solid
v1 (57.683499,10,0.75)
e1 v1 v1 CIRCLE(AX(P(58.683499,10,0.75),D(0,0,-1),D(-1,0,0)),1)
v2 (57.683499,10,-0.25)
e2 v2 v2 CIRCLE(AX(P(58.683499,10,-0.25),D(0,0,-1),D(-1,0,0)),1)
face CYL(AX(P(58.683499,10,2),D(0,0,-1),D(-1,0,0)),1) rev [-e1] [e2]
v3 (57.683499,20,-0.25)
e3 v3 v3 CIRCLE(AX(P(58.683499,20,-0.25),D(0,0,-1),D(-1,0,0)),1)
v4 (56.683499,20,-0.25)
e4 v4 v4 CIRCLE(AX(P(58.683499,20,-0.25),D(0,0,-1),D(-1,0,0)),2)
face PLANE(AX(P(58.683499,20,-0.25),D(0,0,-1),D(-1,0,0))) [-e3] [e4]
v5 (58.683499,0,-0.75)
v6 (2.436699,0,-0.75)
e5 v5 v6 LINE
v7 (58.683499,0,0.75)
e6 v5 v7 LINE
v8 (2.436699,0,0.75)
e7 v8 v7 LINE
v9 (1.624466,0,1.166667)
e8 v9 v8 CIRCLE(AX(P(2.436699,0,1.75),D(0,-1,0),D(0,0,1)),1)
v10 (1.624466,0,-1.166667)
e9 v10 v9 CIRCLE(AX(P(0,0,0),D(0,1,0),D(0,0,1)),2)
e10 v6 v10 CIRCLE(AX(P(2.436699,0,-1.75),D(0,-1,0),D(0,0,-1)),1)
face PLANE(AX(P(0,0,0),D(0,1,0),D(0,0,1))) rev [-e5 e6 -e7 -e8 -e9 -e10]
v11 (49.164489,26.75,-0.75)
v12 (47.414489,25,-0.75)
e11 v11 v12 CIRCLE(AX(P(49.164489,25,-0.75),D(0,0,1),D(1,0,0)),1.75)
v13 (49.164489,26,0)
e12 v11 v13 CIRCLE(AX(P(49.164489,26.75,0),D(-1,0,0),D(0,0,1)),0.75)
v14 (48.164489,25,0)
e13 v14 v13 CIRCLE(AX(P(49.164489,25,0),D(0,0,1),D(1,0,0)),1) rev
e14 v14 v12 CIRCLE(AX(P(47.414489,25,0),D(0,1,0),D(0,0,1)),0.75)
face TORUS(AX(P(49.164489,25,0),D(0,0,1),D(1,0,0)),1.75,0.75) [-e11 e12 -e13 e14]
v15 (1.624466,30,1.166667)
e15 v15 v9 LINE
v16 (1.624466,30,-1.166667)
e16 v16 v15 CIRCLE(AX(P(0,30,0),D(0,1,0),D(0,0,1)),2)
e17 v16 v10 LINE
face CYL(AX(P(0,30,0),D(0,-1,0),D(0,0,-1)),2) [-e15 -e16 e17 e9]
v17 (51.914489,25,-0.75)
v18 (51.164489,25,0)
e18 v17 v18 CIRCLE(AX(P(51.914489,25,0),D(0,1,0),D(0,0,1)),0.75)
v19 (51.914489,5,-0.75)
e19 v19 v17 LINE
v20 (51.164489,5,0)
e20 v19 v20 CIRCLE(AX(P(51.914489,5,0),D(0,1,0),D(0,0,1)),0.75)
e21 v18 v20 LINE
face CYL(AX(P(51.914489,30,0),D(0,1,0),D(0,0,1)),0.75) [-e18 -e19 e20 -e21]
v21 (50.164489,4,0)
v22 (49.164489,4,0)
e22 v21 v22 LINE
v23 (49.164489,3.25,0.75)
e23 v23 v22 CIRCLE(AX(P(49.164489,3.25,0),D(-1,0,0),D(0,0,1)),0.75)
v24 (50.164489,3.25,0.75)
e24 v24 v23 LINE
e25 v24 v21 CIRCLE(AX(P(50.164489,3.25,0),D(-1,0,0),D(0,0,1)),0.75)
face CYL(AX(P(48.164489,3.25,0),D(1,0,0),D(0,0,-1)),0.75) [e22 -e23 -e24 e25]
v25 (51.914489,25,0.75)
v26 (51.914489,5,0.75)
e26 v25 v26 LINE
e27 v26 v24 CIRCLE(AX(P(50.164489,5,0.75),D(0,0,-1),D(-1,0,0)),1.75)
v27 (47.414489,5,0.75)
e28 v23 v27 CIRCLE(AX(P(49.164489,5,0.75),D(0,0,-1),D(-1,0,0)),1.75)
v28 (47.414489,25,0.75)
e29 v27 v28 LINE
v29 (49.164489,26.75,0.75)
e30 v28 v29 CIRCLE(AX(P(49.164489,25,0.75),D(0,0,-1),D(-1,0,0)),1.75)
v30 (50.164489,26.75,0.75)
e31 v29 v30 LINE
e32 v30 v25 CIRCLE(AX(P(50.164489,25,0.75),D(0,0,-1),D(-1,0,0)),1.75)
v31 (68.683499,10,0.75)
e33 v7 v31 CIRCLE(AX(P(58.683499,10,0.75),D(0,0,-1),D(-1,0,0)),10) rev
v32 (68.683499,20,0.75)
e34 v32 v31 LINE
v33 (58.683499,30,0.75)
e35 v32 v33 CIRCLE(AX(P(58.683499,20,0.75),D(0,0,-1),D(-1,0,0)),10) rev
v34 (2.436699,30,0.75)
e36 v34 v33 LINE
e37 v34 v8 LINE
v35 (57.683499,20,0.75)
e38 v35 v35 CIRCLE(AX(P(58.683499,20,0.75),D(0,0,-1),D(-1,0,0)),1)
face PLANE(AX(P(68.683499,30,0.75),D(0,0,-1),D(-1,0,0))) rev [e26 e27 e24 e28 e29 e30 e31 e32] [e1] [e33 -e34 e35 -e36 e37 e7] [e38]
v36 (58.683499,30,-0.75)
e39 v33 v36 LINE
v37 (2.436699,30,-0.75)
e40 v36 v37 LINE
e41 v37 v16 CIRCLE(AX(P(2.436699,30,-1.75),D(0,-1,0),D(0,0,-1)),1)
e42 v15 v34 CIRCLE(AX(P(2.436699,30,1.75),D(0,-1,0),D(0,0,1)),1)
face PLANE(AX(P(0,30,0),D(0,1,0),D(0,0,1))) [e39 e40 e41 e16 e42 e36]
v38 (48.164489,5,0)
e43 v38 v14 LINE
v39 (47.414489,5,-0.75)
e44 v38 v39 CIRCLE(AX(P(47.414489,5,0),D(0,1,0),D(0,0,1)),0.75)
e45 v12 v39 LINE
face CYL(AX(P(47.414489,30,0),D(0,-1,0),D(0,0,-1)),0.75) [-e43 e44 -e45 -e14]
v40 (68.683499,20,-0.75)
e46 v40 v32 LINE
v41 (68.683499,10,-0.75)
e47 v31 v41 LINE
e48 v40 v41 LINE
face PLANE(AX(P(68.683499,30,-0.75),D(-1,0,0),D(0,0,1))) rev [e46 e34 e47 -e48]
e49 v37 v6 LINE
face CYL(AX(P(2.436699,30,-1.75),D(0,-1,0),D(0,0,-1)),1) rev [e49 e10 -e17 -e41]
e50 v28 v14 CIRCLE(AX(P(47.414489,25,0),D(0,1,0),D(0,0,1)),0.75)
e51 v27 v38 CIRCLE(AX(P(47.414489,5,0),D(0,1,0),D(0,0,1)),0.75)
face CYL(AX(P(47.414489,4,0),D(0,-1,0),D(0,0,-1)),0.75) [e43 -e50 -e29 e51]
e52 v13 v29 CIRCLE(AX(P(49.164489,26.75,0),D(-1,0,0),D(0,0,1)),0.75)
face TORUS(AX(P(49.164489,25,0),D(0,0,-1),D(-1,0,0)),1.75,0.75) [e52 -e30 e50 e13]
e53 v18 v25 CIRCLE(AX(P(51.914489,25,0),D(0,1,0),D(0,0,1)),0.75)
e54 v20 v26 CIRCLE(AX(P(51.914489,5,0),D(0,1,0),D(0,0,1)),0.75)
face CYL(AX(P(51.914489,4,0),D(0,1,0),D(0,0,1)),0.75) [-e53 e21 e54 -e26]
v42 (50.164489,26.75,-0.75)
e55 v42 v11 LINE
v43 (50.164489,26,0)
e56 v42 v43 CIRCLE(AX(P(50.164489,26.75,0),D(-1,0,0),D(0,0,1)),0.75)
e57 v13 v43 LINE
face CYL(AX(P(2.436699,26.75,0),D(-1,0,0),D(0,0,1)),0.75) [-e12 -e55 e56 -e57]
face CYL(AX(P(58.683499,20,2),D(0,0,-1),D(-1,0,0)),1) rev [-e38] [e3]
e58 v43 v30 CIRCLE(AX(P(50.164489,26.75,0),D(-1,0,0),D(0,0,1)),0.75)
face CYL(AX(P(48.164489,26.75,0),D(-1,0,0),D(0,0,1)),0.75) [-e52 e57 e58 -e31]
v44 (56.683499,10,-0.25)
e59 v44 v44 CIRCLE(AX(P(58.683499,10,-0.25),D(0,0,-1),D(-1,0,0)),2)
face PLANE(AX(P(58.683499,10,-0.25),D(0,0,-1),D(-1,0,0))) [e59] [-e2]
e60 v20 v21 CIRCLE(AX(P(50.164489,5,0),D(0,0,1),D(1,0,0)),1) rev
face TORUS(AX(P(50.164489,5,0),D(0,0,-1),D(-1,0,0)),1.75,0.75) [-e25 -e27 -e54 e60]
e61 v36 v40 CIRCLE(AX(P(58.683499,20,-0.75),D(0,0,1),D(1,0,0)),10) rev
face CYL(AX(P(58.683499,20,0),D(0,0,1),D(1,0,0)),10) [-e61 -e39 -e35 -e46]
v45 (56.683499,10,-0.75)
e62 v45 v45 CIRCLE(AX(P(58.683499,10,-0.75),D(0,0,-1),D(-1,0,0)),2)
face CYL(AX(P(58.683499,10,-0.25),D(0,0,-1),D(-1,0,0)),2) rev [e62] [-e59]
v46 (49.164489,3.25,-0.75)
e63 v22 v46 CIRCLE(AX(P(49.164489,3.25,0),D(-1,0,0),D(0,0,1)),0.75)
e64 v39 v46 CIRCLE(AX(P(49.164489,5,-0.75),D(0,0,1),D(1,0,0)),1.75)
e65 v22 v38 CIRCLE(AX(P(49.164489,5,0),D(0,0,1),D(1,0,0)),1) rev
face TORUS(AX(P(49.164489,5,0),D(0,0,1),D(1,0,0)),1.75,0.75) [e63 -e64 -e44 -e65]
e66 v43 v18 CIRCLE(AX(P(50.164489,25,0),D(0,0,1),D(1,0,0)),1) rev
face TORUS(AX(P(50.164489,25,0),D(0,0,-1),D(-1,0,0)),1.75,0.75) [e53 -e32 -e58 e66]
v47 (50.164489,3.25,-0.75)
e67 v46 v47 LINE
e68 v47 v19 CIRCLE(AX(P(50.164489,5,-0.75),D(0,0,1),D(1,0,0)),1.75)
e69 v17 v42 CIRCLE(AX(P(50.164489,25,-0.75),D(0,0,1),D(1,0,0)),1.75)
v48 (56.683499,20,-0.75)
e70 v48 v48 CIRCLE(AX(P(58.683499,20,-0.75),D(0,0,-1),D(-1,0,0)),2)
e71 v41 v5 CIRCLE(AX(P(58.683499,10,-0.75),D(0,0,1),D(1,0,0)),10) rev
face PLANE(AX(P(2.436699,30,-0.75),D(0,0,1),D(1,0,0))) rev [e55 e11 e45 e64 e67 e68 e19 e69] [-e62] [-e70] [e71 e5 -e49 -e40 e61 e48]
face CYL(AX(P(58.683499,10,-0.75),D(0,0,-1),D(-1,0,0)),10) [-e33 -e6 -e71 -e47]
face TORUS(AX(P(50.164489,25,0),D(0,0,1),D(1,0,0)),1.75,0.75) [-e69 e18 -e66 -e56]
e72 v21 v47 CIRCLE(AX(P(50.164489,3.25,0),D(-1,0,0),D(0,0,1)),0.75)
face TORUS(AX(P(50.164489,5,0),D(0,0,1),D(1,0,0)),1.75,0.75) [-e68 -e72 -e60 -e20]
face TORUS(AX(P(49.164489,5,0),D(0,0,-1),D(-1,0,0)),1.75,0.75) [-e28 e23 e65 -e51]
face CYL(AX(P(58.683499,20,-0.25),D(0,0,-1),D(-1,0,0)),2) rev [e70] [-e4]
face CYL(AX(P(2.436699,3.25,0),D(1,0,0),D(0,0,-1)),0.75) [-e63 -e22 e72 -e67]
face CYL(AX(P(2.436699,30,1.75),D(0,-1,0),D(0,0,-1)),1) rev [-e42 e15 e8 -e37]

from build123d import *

# Parameters (mm, degrees)
BOSS_EXTRUDE1_DEPTH = 30
SKETCH2_W           = 3
SKETCH2_H           = 22
CUT_EXTRUDE1_DEPTH  = 75.999903187
FILLET2_R           = 10
SKETCH5_R           = 2
CUT_EXTRUDE2_DEPTH  = 0.5
SKETCH8_R           = 1
CUT_EXTRUDE3_DEPTH  = 75.983234646
FILLET3_R           = 1
FILLET4_R           = 0.75


with BuildPart() as part:
    # Sketch1 → Boss-Extrude1 (new body)
    with BuildSketch(Plane(origin=(0, 0, 0), x_dir=(1, 0, 0), z_dir=(0, 1, 0))):
        with BuildLine():
            Line((2.436698586, 0.75), (68.683498586, 0.75))
            Line((68.683498586, 0.75), (68.683498586, -0.75))
            Line((68.683498586, -0.75), (2.436698586, -0.75))
            ThreePointArc((2.436698586, -0.75), (1.980263122, -0.860243479), (1.624465724, -1.166666667))
            ThreePointArc((1.624465724, -1.166666667), (-2, 0), (1.624465724, 1.166666667))
            ThreePointArc((1.624465724, 1.166666667), (1.980263122, 0.860243479), (2.436698586, 0.75))
        make_face()
    extrude(amount=BOSS_EXTRUDE1_DEPTH)

    # Sketch2 → Cut-Extrude1 (cut, through all)
    with BuildSketch(Plane.XY.offset(0.75)):
        with Locations((49.664488586, 15)):
            Rectangle(SKETCH2_W, SKETCH2_H)
    extrude(amount=-CUT_EXTRUDE1_DEPTH, mode=Mode.SUBTRACT)

    # Fillet2
    fillet2_edges = [part.edges().sort_by_distance(p)[0] for p in [
        (68.683498586, 30, 0),
        (68.683498586, 0, 0),
    ]]
    fillet(fillet2_edges, radius=FILLET2_R)

    # Sketch5 → Cut-Extrude2 (cut)
    with BuildSketch(Plane(origin=(0, 0, -0.75), x_dir=(-1, 0, 0), z_dir=(0, 0, -1))):
        with Locations((-58.683498586, 20)):
            Circle(SKETCH5_R)
        with Locations((-58.683498586, 10)):
            Circle(SKETCH5_R)
    extrude(amount=-CUT_EXTRUDE2_DEPTH, mode=Mode.SUBTRACT)

    # Sketch8 → Cut-Extrude3 (cut, through all)
    with BuildSketch(Plane(origin=(0, 0, -0.25), x_dir=(-1, 0, 0), z_dir=(0, 0, -1))):
        with Locations((-58.683498586, 20)):
            Circle(SKETCH8_R)
        with Locations((-58.683498586, 10)):
            Circle(SKETCH8_R)
    extrude(amount=-CUT_EXTRUDE3_DEPTH, mode=Mode.SUBTRACT)

    # Fillet3
    fillet3_edges = [part.edges().sort_by_distance(p)[0] for p in [
        (51.164488586, 26, 0),
        (51.164488586, 4, 0),
        (48.164488586, 4, 0),
        (48.164488586, 26, 0),
    ]]
    fillet(fillet3_edges, radius=FILLET3_R)

    # Fillet4
    fillet4_edges = [part.edges().sort_by_distance(p)[0] for p in [
        (48.457381805, 25.707106781, 0.75),
        (49.664488586, 26, 0.75),
        (50.871595367, 25.707106781, 0.75),
        (51.164488586, 15, 0.75),
        (50.871595367, 4.292893219, 0.75),
        (49.664488586, 4, 0.75),
        (48.457381805, 4.292893219, 0.75),
        (48.457381805, 25.707106781, -0.75),
        (49.664488586, 26, -0.75),
        (50.871595367, 25.707106781, -0.75),
        (51.164488586, 15, -0.75),
        (50.871595367, 4.292893219, -0.75),
        (49.664488586, 4, -0.75),
        (48.457381805, 4.292893219, -0.75),
        (48.164488586, 15, 0.75),
        (48.164488586, 15, -0.75),
    ]]
    fillet(fillet4_edges, radius=FILLET4_R - 0.0001)  # a hair under: the kernel refuses the full size


solid = part.part
